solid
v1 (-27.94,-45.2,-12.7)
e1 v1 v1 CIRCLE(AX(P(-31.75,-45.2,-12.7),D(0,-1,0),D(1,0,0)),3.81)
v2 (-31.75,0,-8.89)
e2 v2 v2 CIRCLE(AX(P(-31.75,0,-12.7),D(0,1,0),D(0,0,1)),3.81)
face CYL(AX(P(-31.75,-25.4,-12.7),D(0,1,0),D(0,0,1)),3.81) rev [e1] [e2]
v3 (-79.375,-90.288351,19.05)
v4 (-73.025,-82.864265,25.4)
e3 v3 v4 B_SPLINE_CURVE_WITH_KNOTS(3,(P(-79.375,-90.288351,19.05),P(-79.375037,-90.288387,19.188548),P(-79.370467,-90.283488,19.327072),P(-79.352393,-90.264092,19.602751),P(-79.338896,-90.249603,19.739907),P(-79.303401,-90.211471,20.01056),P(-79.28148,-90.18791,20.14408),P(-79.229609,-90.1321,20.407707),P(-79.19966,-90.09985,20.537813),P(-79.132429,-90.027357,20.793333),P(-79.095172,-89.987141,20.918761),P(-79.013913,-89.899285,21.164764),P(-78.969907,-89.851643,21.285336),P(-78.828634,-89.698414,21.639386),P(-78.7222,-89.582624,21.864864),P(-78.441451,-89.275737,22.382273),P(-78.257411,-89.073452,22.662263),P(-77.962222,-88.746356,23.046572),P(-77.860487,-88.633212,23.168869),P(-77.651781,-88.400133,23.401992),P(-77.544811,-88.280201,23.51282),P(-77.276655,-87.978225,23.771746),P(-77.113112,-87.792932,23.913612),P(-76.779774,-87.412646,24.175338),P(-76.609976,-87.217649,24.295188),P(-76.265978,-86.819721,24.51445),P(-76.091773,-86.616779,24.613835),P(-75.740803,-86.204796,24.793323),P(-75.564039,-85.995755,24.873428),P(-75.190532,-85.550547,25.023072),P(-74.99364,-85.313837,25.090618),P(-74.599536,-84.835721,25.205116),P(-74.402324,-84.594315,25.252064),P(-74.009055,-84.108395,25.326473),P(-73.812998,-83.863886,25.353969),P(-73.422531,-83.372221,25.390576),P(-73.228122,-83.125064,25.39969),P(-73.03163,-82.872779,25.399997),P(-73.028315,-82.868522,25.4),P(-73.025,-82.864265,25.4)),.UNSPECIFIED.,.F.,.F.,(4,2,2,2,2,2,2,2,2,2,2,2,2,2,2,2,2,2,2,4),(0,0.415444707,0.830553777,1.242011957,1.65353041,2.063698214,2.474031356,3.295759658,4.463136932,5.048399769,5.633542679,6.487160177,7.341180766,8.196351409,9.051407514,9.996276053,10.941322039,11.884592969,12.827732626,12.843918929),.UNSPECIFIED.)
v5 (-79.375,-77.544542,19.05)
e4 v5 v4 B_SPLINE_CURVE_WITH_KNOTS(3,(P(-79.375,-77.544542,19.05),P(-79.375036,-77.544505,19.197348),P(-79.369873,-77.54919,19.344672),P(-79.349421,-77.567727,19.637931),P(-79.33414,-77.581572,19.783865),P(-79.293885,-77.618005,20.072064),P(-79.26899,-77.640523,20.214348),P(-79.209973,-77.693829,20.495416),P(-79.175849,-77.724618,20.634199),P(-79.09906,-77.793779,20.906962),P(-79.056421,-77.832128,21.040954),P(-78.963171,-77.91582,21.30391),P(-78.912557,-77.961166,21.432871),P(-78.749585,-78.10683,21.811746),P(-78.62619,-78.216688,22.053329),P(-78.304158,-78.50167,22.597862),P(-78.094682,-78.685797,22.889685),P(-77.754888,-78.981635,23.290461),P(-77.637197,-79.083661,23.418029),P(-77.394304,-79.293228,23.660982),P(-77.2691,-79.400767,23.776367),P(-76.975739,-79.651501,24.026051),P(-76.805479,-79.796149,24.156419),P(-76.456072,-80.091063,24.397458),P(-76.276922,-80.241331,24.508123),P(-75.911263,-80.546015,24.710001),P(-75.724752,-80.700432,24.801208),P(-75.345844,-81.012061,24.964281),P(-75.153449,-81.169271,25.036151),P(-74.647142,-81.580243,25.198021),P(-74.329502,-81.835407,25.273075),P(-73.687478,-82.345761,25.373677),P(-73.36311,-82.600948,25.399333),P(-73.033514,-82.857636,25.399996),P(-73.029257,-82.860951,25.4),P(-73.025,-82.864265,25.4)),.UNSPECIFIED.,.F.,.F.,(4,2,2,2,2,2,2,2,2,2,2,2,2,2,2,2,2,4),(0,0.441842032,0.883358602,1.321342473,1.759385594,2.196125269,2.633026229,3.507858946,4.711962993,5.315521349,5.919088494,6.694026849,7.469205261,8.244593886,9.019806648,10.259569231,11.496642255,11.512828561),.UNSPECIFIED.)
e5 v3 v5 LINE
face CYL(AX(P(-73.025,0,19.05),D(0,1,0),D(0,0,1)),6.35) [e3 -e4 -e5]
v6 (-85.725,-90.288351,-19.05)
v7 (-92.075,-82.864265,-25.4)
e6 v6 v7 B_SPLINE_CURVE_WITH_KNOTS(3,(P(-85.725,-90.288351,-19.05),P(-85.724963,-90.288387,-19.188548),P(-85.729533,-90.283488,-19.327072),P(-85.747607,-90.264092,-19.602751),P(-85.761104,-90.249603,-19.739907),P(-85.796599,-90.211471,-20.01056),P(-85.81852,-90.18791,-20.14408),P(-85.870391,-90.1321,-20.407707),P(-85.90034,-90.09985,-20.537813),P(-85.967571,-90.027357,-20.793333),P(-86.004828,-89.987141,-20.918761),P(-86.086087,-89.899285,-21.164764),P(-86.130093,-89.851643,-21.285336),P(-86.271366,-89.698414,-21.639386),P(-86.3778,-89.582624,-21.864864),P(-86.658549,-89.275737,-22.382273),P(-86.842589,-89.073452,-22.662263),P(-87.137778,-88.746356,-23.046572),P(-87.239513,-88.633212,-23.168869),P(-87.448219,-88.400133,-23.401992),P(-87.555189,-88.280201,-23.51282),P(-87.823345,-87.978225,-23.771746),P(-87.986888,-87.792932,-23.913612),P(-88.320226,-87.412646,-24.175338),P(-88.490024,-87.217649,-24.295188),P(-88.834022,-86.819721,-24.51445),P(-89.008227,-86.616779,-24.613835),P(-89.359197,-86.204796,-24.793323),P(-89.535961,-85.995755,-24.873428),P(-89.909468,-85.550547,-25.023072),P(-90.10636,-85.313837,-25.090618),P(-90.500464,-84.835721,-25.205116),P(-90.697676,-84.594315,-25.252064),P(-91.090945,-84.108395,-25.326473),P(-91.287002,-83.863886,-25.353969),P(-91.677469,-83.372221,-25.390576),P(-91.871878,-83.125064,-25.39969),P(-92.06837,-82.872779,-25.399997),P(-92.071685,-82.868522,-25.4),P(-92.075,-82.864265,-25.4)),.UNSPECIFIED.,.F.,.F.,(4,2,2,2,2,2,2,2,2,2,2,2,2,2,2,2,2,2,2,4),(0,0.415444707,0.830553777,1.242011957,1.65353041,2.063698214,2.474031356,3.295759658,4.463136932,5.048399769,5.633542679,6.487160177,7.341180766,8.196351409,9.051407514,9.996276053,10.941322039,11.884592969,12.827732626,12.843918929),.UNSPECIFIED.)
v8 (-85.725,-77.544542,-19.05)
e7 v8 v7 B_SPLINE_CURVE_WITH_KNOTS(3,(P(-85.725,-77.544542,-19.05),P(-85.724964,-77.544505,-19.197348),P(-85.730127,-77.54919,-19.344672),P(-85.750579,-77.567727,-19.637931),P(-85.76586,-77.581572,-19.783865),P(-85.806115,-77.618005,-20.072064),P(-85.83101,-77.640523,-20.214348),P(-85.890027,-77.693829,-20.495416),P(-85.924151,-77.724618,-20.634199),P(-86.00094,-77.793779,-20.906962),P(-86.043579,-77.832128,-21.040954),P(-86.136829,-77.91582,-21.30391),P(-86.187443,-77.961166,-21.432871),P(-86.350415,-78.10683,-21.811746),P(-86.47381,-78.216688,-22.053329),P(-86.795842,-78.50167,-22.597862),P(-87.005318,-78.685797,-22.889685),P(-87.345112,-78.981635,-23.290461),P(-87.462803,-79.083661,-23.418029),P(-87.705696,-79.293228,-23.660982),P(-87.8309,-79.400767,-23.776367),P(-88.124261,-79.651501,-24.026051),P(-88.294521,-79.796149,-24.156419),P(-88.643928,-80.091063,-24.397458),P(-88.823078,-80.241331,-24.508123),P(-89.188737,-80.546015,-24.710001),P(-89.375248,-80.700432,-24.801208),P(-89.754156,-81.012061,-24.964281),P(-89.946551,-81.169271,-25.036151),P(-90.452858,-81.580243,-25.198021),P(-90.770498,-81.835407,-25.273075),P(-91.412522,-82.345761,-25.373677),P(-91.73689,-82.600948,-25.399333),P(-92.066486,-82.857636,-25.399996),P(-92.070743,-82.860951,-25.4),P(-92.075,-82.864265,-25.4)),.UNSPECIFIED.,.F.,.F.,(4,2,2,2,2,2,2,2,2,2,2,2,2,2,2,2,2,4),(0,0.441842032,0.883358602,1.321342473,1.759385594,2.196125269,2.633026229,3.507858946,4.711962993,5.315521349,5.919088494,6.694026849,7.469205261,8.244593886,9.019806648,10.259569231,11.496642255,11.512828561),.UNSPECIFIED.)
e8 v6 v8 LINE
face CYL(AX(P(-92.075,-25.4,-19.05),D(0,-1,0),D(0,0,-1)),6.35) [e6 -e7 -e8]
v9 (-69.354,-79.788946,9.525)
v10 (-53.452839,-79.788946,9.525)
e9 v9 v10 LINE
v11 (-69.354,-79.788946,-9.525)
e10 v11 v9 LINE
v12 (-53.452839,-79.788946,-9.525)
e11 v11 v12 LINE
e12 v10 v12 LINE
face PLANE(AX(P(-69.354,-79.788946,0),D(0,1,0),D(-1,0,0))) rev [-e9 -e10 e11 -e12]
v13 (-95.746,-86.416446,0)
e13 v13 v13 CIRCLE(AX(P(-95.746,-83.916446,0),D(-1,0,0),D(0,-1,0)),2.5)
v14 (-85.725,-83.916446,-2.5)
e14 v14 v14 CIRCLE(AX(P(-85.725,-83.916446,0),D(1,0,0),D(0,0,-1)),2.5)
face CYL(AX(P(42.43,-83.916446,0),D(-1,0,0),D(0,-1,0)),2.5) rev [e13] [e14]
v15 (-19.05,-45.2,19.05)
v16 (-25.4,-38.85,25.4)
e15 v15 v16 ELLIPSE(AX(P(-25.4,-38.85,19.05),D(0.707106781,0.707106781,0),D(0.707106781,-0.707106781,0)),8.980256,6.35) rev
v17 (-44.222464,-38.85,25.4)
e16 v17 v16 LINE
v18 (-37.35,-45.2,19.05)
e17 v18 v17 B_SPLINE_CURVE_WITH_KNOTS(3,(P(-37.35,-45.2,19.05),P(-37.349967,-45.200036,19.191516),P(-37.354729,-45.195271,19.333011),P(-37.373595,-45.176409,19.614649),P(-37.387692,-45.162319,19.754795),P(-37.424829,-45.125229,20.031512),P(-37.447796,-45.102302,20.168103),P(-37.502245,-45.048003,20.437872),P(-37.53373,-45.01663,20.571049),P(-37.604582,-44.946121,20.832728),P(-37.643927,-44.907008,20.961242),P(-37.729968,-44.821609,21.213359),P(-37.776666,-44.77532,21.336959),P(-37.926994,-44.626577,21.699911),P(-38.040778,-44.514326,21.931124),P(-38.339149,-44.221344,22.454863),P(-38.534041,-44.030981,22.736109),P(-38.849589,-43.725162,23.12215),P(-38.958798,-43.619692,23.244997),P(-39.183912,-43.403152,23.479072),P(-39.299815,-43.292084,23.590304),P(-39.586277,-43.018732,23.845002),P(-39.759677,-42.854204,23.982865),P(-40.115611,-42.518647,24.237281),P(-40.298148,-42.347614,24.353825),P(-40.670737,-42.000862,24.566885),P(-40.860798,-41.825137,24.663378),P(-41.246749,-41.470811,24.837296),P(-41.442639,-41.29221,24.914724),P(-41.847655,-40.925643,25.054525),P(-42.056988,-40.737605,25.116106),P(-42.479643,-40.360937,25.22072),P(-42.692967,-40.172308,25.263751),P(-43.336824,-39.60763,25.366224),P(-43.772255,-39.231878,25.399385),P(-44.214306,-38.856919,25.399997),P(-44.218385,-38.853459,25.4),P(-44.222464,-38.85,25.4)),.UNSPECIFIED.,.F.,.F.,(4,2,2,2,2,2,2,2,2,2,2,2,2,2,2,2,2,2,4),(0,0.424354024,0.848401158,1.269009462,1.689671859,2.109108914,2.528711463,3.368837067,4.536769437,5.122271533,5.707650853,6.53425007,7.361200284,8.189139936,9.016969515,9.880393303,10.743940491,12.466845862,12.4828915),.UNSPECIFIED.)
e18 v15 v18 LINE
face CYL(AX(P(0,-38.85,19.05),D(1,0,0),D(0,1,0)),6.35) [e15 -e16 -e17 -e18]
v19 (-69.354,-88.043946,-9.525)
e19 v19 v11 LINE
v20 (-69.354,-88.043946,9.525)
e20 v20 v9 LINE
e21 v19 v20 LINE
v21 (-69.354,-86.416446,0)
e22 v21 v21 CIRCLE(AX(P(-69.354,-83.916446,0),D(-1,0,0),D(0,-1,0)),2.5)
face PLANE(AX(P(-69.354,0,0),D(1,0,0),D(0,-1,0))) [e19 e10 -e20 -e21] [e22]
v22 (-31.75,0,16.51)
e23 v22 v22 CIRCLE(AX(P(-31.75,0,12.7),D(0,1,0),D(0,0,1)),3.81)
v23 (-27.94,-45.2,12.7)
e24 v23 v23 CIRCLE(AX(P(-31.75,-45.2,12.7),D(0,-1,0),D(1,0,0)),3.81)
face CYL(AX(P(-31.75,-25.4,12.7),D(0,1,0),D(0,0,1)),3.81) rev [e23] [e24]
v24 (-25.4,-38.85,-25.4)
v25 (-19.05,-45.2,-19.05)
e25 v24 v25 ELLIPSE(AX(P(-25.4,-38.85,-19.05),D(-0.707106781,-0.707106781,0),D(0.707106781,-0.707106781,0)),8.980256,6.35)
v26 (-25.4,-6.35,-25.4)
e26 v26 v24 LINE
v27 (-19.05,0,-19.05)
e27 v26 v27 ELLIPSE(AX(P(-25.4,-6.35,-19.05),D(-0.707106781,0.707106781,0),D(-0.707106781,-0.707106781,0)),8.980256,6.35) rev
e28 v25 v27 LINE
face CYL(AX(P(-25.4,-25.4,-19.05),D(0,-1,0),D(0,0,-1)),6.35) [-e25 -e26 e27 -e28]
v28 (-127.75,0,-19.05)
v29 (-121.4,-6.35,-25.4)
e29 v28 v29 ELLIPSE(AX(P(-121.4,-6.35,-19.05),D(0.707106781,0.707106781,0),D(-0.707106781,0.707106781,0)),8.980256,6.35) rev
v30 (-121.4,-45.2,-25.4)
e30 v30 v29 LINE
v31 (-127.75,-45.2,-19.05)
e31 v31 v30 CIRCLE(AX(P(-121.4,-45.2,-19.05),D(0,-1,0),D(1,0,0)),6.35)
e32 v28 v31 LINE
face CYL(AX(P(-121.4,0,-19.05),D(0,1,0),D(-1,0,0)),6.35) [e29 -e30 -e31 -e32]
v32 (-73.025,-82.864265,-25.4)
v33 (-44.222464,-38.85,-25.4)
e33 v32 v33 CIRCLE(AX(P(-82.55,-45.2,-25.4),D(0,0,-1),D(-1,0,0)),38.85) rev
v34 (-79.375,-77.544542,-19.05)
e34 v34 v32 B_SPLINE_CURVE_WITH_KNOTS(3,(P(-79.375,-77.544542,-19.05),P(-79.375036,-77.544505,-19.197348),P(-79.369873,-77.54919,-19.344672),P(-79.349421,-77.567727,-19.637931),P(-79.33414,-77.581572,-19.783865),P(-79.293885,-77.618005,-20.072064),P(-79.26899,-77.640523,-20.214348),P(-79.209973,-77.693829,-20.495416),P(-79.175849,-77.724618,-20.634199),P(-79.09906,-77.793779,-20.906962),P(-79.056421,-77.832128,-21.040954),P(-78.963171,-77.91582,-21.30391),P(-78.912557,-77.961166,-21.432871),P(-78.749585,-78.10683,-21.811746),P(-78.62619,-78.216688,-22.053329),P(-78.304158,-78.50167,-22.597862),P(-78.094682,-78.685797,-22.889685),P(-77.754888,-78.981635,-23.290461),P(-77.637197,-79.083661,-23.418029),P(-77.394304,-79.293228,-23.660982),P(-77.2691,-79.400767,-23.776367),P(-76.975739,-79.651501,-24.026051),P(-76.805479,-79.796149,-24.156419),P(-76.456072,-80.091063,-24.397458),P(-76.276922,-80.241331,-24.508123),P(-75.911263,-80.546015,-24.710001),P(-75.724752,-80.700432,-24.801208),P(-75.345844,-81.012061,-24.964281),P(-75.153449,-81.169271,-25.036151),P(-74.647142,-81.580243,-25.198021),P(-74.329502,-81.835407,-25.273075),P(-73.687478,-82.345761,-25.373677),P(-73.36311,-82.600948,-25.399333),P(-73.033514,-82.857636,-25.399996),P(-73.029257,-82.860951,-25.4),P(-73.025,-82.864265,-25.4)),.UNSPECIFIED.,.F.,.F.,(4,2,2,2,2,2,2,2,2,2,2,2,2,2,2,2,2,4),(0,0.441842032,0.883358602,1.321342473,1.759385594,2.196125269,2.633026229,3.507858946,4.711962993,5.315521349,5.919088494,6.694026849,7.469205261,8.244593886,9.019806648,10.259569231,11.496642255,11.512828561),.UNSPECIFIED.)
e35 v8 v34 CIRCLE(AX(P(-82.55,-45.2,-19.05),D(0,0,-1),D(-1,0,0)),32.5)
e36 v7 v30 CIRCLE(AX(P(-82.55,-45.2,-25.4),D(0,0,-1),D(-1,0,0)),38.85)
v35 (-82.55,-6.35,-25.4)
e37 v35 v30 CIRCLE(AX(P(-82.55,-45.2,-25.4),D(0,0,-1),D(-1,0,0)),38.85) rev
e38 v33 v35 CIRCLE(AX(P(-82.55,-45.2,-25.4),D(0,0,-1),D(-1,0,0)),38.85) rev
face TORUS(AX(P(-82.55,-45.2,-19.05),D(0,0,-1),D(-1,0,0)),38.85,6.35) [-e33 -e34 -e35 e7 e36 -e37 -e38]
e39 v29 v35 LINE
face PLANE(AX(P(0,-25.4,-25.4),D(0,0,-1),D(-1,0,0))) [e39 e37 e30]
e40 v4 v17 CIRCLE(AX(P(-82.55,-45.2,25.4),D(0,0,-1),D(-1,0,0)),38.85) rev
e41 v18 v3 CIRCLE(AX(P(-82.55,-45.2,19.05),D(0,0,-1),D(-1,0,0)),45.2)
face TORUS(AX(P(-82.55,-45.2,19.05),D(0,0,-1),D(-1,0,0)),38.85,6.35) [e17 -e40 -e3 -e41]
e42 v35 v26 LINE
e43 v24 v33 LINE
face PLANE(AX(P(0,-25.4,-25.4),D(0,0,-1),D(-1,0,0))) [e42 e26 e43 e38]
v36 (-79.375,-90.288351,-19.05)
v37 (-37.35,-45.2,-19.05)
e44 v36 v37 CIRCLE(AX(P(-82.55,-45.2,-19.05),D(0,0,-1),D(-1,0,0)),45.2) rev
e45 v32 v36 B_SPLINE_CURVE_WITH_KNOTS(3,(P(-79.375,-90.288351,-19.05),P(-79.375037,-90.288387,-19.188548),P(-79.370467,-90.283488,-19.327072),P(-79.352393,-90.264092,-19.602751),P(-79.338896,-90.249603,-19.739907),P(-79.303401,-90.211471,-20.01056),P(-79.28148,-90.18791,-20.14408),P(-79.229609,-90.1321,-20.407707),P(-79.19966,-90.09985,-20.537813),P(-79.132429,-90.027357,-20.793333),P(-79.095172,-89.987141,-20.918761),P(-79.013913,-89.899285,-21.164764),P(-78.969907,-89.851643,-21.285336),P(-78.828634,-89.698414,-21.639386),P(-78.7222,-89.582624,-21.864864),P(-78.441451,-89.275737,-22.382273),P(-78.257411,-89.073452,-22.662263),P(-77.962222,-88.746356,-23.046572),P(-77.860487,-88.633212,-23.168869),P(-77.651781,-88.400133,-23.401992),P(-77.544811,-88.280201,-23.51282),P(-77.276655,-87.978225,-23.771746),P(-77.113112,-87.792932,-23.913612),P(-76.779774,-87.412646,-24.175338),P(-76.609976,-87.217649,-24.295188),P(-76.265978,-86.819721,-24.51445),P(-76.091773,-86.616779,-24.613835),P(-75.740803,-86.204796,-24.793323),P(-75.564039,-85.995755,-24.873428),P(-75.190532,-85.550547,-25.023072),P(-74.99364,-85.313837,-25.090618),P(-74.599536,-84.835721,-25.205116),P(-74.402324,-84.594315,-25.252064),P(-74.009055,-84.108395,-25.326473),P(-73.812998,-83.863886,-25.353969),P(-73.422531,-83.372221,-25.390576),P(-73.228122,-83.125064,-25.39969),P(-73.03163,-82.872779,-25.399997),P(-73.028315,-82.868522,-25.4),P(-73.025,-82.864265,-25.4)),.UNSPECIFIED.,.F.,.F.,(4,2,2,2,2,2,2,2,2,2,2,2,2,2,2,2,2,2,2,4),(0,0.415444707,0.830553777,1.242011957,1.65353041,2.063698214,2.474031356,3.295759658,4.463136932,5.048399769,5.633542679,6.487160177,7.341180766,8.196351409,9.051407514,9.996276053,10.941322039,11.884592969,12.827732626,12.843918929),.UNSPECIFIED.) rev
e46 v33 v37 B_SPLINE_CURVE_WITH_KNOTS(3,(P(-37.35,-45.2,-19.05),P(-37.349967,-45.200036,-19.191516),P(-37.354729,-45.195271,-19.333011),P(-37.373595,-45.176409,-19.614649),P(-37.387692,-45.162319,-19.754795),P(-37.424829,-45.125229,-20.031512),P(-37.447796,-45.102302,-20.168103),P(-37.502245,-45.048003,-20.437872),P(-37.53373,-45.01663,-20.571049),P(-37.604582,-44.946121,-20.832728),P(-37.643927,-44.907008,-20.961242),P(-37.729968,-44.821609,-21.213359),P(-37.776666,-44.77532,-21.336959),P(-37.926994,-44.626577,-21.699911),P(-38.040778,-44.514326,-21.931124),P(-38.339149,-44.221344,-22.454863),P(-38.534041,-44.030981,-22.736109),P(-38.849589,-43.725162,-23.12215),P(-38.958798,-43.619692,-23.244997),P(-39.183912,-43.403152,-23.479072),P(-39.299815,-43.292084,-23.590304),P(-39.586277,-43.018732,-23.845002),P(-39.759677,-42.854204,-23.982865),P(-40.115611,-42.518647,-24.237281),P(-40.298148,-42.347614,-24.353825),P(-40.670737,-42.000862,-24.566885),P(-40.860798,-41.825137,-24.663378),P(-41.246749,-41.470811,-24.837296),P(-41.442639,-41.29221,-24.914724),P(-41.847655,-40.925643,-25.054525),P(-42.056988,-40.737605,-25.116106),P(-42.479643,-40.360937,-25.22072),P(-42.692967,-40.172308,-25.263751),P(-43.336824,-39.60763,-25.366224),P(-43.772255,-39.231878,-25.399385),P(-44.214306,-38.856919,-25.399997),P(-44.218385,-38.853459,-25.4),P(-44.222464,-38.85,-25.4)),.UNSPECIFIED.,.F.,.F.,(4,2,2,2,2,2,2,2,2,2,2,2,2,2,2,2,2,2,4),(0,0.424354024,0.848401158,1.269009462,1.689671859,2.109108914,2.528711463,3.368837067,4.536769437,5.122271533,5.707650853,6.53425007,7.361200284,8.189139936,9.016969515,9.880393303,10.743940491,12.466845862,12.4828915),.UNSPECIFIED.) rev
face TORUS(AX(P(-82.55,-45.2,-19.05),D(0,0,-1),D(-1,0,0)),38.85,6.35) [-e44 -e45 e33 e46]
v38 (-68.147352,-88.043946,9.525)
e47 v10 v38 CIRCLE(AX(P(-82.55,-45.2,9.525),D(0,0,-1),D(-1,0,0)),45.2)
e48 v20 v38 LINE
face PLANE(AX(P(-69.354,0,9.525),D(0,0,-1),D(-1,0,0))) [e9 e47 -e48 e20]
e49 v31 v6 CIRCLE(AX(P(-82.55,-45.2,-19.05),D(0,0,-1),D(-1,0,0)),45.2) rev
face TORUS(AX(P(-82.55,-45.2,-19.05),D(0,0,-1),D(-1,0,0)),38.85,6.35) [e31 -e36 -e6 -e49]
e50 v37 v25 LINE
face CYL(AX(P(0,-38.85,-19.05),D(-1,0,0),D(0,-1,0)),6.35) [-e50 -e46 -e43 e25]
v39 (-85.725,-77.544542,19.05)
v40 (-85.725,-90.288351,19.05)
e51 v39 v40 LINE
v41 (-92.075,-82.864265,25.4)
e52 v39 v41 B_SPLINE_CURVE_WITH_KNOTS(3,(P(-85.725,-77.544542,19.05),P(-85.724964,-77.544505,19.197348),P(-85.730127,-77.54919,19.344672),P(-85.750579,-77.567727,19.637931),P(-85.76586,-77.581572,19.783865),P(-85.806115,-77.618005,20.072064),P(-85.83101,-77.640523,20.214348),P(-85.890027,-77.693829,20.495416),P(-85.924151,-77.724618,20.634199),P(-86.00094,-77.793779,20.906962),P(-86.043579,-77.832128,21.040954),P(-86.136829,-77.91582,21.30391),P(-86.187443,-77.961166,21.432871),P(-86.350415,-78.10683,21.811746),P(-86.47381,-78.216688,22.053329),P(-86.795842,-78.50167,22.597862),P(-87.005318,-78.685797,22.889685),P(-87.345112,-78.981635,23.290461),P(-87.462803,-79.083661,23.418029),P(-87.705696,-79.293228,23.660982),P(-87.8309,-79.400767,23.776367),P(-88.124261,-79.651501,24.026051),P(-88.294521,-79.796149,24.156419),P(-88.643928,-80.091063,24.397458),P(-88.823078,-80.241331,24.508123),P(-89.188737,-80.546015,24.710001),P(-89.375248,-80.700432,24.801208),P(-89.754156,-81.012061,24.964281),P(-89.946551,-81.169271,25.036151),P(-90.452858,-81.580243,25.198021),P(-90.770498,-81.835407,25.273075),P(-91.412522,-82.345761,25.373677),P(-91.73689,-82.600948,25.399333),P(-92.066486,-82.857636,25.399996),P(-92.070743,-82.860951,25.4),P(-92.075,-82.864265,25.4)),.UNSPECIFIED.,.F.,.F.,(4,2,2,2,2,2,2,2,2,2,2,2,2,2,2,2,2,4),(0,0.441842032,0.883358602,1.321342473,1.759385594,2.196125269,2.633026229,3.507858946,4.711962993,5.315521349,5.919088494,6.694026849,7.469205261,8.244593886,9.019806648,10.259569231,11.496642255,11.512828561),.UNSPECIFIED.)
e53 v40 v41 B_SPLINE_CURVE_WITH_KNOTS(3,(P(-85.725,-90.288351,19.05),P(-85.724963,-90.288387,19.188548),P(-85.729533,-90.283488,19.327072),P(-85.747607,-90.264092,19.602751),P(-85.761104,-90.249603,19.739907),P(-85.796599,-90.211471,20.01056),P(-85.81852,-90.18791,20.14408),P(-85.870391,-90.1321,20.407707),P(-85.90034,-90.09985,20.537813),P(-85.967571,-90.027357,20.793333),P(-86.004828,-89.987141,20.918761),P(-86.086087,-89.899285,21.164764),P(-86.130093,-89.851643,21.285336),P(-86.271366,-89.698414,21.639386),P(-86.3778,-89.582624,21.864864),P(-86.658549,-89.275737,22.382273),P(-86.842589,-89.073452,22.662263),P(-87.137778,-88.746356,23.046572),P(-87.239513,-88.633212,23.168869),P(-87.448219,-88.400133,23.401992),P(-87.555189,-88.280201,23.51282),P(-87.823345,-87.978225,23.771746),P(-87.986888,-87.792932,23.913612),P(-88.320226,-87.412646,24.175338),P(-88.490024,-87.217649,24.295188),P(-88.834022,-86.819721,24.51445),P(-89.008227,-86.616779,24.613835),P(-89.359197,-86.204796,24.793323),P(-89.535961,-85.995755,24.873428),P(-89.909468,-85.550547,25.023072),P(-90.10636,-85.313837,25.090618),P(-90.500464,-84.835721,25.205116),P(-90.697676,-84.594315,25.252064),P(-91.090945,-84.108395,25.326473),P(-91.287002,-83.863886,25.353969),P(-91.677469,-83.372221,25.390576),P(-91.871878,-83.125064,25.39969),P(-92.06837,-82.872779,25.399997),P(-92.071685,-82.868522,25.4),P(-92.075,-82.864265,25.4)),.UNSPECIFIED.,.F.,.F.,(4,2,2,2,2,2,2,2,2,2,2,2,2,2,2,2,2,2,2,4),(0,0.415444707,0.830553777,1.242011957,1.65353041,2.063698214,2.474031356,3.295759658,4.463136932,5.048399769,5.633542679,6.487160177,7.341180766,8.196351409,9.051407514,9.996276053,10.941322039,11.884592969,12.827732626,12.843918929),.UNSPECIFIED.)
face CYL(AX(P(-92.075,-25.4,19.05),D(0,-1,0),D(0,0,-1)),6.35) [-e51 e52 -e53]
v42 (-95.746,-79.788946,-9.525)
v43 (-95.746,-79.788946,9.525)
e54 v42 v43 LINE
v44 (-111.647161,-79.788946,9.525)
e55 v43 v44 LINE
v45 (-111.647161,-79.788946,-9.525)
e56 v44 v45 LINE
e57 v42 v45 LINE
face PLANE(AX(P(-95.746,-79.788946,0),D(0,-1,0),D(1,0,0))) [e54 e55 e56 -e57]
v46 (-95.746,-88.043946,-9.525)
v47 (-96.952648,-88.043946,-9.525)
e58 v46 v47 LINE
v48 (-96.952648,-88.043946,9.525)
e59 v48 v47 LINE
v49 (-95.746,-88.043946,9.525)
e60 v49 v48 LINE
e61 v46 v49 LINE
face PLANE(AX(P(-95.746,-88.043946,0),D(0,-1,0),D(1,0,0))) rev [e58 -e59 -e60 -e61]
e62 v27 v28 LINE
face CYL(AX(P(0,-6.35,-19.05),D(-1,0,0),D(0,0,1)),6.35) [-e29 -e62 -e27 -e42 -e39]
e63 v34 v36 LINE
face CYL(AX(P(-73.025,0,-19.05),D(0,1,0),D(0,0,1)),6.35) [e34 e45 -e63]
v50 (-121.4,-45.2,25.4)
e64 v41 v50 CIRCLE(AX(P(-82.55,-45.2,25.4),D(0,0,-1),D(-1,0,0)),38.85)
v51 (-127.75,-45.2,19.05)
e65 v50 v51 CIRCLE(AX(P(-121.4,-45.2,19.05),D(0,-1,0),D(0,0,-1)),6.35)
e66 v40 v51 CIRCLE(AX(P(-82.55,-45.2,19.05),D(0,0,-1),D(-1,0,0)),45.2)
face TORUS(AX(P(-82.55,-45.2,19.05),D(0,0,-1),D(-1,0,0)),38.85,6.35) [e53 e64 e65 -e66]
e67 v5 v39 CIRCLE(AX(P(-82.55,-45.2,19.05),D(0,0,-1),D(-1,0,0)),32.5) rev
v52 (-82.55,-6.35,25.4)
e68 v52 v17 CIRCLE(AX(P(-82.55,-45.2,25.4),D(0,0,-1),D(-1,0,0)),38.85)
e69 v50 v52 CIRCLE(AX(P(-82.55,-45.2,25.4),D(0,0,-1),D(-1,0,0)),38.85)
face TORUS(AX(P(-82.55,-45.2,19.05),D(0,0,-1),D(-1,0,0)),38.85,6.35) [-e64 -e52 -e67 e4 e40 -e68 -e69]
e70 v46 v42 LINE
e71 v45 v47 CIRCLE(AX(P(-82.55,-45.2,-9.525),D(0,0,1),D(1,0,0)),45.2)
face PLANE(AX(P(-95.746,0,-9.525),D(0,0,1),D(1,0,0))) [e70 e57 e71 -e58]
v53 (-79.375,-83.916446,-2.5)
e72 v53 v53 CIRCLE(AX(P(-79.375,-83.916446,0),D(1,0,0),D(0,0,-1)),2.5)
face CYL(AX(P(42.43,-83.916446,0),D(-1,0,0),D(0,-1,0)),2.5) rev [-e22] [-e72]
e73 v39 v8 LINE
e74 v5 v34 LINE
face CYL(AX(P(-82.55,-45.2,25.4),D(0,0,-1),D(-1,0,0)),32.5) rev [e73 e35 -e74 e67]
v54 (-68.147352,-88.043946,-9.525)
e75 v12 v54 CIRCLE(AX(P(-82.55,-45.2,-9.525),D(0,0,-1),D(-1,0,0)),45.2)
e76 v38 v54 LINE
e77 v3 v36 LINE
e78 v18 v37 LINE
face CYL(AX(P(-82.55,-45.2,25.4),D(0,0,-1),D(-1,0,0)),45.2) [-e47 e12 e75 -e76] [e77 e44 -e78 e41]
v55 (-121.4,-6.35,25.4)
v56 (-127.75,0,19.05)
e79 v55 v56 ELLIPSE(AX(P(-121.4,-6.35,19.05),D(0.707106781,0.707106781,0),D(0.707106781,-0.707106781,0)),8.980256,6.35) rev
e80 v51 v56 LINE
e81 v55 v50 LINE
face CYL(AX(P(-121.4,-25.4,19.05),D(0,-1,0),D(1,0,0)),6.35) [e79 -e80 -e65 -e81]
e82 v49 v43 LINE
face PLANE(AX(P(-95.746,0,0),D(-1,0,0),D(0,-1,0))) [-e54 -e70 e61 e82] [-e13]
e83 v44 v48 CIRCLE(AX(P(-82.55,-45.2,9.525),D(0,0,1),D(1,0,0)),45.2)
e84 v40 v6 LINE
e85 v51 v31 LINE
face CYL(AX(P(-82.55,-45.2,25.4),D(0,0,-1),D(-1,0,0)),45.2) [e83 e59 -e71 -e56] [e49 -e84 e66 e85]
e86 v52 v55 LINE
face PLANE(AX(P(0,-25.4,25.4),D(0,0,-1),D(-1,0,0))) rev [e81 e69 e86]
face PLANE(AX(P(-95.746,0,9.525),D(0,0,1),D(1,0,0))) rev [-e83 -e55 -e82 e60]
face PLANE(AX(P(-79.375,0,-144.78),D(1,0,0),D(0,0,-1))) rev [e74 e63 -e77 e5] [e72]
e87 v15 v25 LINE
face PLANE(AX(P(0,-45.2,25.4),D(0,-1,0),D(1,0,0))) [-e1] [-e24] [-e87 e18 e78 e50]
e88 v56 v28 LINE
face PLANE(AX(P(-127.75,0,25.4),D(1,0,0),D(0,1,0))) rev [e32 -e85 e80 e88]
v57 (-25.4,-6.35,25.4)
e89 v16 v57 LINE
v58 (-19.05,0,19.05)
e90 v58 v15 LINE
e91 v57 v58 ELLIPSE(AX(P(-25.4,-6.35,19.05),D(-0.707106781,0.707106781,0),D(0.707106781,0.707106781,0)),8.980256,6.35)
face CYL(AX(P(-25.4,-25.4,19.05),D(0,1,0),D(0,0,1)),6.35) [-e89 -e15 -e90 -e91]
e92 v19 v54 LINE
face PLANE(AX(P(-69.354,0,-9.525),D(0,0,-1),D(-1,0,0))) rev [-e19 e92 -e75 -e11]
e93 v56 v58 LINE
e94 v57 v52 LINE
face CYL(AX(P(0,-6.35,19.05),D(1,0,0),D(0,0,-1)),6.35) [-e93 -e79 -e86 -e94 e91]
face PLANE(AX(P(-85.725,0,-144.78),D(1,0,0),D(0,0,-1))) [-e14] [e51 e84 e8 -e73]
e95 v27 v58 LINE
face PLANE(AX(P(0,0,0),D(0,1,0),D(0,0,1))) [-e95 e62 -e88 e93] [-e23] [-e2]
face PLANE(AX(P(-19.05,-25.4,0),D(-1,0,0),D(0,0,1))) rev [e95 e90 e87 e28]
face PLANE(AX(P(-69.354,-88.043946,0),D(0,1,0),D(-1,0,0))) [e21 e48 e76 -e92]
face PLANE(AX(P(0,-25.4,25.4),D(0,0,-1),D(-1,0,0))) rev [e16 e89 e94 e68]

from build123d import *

# Parameters (mm, degrees)
SKETCH2_W           = 25.4
SKETCH2_H           = 50.8
SKETCH2_R           = 3.81
BOSS_EXTRUDE1_DEPTH = 25.4
BOSS_EXTRUDE2_DEPTH = 25.4
CUT_EXTRUDE1_DEPTH  = 170.18
CUT_EXTRUDE2_DEPTH  = 170.18
SKETCH5_3_W         = 19.05
SKETCH5_3_H         = 8.255
SKETCH5_3_R         = 2.5
CUT_EXTRUDE3_DEPTH  = 32.004
SKETCH6_R           = 3.81
CUT_EXTRUDE4_DEPTH  = 32.004
FILLET1_R           = 6.35


with BuildPart() as part:
    # Sketch2 → Boss-Extrude1 (new body)
    with BuildSketch(Plane(origin=(0, 0, 0), x_dir=(1, 0, 0), z_dir=(0, 1, 0))):
        with Locations((-31.75, 0)):
            Rectangle(SKETCH2_W, SKETCH2_H)
        with Locations(Location((-31.75, -12.7, 0), (0, 0, 270))):
            Circle(SKETCH2_R, mode=Mode.SUBTRACT)
        with Locations(Location((-31.75, 12.7, 0), (0, 0, 270))):
            Circle(SKETCH2_R, mode=Mode.SUBTRACT)
    extrude(amount=-BOSS_EXTRUDE1_DEPTH)

    # Sketch3 → Boss-Extrude2 (add, symmetric)
    with BuildSketch(Plane.XY):
        with BuildLine():
            Line((-44.45, -25.4), (-44.45, 0))
            Line((-44.45, 0), (-127.75, 0))
            Line((-127.75, 0), (-127.75, -45.2))
            Line((-127.75, -45.2), (-115.05, -45.2))
            ThreePointArc((-115.05, -45.2), (-82.55, -12.7), (-50.05, -45.2))
            Line((-50.05, -45.2), (-37.35, -45.2))
            Line((-37.35, -45.2), (-19.05, -45.2))
            Line((-19.05, -45.2), (-19.05, -25.4))
            Line((-19.05, -25.4), (-44.45, -25.4))
        make_face()
        with BuildLine():
            Line((-115.05, -45.2), (-127.75, -45.2))
            ThreePointArc((-127.75, -45.2), (-82.55, -90.4), (-37.35, -45.2))
            Line((-37.35, -45.2), (-50.05, -45.2))
            ThreePointArc((-50.05, -45.2), (-82.55, -77.7), (-115.05, -45.2))
        make_face()
    extrude(amount=BOSS_EXTRUDE2_DEPTH, both=True)

    # Sketch4 → Cut-Extrude1 (cut)
    with BuildSketch(Plane.XY.offset(25.4)):
        with BuildLine():
            Line((-85.725, -90.288350768), (-85.725, -104.566683373))
            Line((-85.725, -104.566683373), (-79.375, -104.566683373))
            Line((-79.375, -104.566683373), (-79.375, -90.288350768))
            ThreePointArc((-79.375, -90.288350768), (-82.55, -90.4), (-85.725, -90.288350768))
        make_face()
        with BuildLine():
            ThreePointArc((-50.05, -45.2), (-104.379595736, -21.122650686), (-85.725, -77.544541657))
            Line((-85.725, -77.544541657), (-85.725, -50.833316627))
            Line((-85.725, -50.833316627), (-79.375, -50.833316627))
            Line((-79.375, -50.833316627), (-79.375, -77.544541657))
            ThreePointArc((-79.375, -77.544541657), (-58.472650686, -67.029595736), (-50.05, -45.2))
        make_face()
        with BuildLine():
            Line((-85.725, -50.833316627), (-85.725, -77.544541657))
            ThreePointArc((-85.725, -77.544541657), (-82.55, -77.7), (-79.375, -77.544541657))
            Line((-79.375, -77.544541657), (-79.375, -50.833316627))
            Line((-79.375, -50.833316627), (-85.725, -50.833316627))
        make_face()
        with BuildLine():
            Line((-85.725, -77.544541657), (-85.725, -90.288350768))
            ThreePointArc((-85.725, -90.288350768), (-82.55, -90.4), (-79.375, -90.288350768))
            Line((-79.375, -90.288350768), (-79.375, -77.544541657))
            ThreePointArc((-79.375, -77.544541657), (-82.55, -77.7), (-85.725, -77.544541657))
        make_face()
    extrude(amount=-CUT_EXTRUDE1_DEPTH, mode=Mode.SUBTRACT)

    # Sketch5 → Cut-Extrude2 (cut)
    with BuildSketch(Plane.ZY.offset(127.75)):
        with BuildLine():
            ThreePointArc((2.5, -83.916446213), (1.767766953, -82.14867926), (0, -81.416446213))
            Line((0, -81.416446213), (0, -86.416446213))
            ThreePointArc((0, -86.416446213), (1.767766953, -85.684213166), (2.5, -83.916446213))
        make_face()
        with BuildLine():
            Line((0, -86.416446213), (0, -81.416446213))
            ThreePointArc((0, -81.416446213), (-2.5, -83.916446213), (0, -86.416446213))
        make_face()
    extrude(amount=-CUT_EXTRUDE2_DEPTH, mode=Mode.SUBTRACT)

    # Sketch5<3> → Cut-Extrude3 (cut)
    with BuildSketch(Plane.ZY.offset(127.75)):
        with Locations((0, -83.916446213)):
            Rectangle(SKETCH5_3_W, SKETCH5_3_H)
        with Locations(Location((0, -83.916446213, 0), (0, 0, 270))):
            Circle(SKETCH5_3_R, mode=Mode.SUBTRACT)
    cut_extrude3 = extrude(amount=-CUT_EXTRUDE3_DEPTH, mode=Mode.SUBTRACT)

    # Mirror1: Cut-Extrude3 across plane
    add(cut_extrude3.mirror(Plane.ZY.offset(82.55)), mode=Mode.SUBTRACT)

    # Sketch6 → Cut-Extrude4 (cut)
    with BuildSketch(Plane(origin=(0, -25.4, 0), x_dir=(1, 0, 0), z_dir=(0, 1, 0))):
        with Locations(Location((-31.75, -12.7, 0), (0, 0, 270))):
            Circle(SKETCH6_R)
        with Locations(Location((-31.75, 12.7, 0), (0, 0, 270))):
            Circle(SKETCH6_R)
    extrude(amount=-CUT_EXTRUDE4_DEPTH, mode=Mode.SUBTRACT)

    # Fillet1
    # the kernel refuses this fillet: 6.35 mm, written as the material it takes off along each edge
    with BuildSketch(Plane(origin=(-19.05, -61.075, 25.4), x_dir=(-1, 0, 0), z_dir=(0, 1, 0))) as fillet1_piece_1:
        with BuildLine():
            CenterArc((FILLET1_R, -FILLET1_R), FILLET1_R, 90, 90)
            Line((0, -FILLET1_R), (0, 0))
            Line((0, 0), (FILLET1_R, 0))
        make_face()
    extrude(amount=76.95, mode=Mode.SUBTRACT)
    with BuildSketch(Plane(origin=(-19.05, -61.075, -25.4), x_dir=(-1, 0, 0), z_dir=(0, 1, 0))) as fillet1_piece_2:
        with BuildLine():
            CenterArc((FILLET1_R, FILLET1_R), FILLET1_R, 180, 90)
            Line((0, FILLET1_R), (0, 0))
            Line((0, 0), (FILLET1_R, 0))
        make_face()
    extrude(amount=76.95, mode=Mode.SUBTRACT)
    with BuildSketch(Plane(origin=(-82.55, -45.2, -25.4), x_dir=(-1, 0, 0), z_dir=(0, 1, 0))) as fillet1_piece_3:
        with BuildLine():
            CenterArc((45.2 - FILLET1_R, FILLET1_R), FILLET1_R, 270, 90)
            Line((45.2, FILLET1_R), (45.2, 0))
            Line((45.2, 0), (45.2 - FILLET1_R, 0))
        make_face()
    revolve(axis=Axis((-82.55, -45.2, -25.4), (0, 0, 1)), revolution_arc=106.102651965, mode=Mode.SUBTRACT)
    with BuildSketch(Plane(origin=(-53.225, -45.2, 25.4), x_dir=(0, 1, 0), z_dir=(1, 0, 0))) as fillet1_piece_4_section:
        with BuildLine():
            CenterArc((FILLET1_R, -FILLET1_R), FILLET1_R, 90, 90)
            Line((0, -FILLET1_R), (0, 0))
            Line((0, 0), (FILLET1_R, 0))
        make_face()
    fillet1_piece_4 = extrude(amount=50.05, mode=Mode.PRIVATE)
    fillet1_piece_4 = fillet1_piece_4 - Plane(origin=(-82.55, -45.2, 23.963727381), x_dir=(-1, 0, 0), z_dir=(0, 0, 1)) * Cylinder(45.2, 126, mode=Mode.PRIVATE)
    add(fillet1_piece_4, mode=Mode.SUBTRACT)
    with BuildSketch(Plane(origin=(-127.75, 15.875, -25.4), x_dir=(1, 0, 0), z_dir=(0, -1, 0))) as fillet1_piece_5:
        with BuildLine():
            CenterArc((FILLET1_R, FILLET1_R), FILLET1_R, 180, 90)
            Line((0, FILLET1_R), (0, 0))
            Line((0, 0), (FILLET1_R, 0))
        make_face()
    extrude(amount=61.075, mode=Mode.SUBTRACT)
    with BuildSketch(Plane(origin=(-82.55, -45.2, 25.4), x_dir=(-1, 0, 0), z_dir=(0, 1, 0))) as fillet1_piece_6:
        with BuildLine():
            CenterArc((45.2 - FILLET1_R, -FILLET1_R), FILLET1_R, 360, 90)
            Line((45.2, -FILLET1_R), (45.2, 0))
            Line((45.2, 0), (45.2 - FILLET1_R, 0))
        make_face()
    revolve(axis=Axis((-82.55, -45.2, 25.4), (0, 0, 1)), revolution_arc=106.102651965, mode=Mode.SUBTRACT)
    with BuildSketch(Plane(origin=(-127.75, 15.875, 25.4), x_dir=(1, 0, 0), z_dir=(0, -1, 0))) as fillet1_piece_7:
        with BuildLine():
            CenterArc((FILLET1_R, -FILLET1_R), FILLET1_R, 90, 90)
            Line((0, -FILLET1_R), (0, 0))
            Line((0, 0), (FILLET1_R, 0))
        make_face()
    extrude(amount=61.075, mode=Mode.SUBTRACT)
    with BuildSketch(Plane(origin=(-3.175, -45.2, -25.4), x_dir=(0, 0, 1), z_dir=(-1, 0, 0))) as fillet1_piece_8_section:
        with BuildLine():
            CenterArc((FILLET1_R, FILLET1_R), FILLET1_R, 180, 90)
            Line((0, FILLET1_R), (0, 0))
            Line((0, 0), (FILLET1_R, 0))
        make_face()
    fillet1_piece_8 = extrude(amount=50.05, mode=Mode.PRIVATE)
    fillet1_piece_8 = fillet1_piece_8 - Plane(origin=(-82.55, -45.2, -23.963731438), x_dir=(-1, 0, 0), z_dir=(0, 0, 1)) * Cylinder(45.2, 126, mode=Mode.PRIVATE)
    add(fillet1_piece_8, mode=Mode.SUBTRACT)
    with BuildSketch(Plane(origin=(-82.55, -45.2, -25.4), x_dir=(-0.2773591231629705, -0.9607663174769753, 0), z_dir=(-0.9607663174769753, 0.2773591231629705, 0))) as fillet1_piece_9:
        with BuildLine():
            CenterArc((45.2 - FILLET1_R, FILLET1_R), FILLET1_R, 270, 90)
            Line((45.2, FILLET1_R), (45.2, 0))
            Line((45.2, 0), (45.2 - FILLET1_R, 0))
        make_face()
    revolve(axis=Axis((-82.55, -45.2, -25.4), (0, 0, 1)), revolution_arc=106.102651965, mode=Mode.SUBTRACT)
    with BuildSketch(Plane(origin=(-82.55, -45.2, 25.4), x_dir=(-0.27735912316299666, -0.9607663174769677, 0), z_dir=(-0.9607663174769677, 0.27735912316299666, 0))) as fillet1_piece_10:
        with BuildLine():
            CenterArc((45.2 - FILLET1_R, -FILLET1_R), FILLET1_R, 0, 90)
            Line((45.2, -FILLET1_R), (45.2, 0))
            Line((45.2, 0), (45.2 - FILLET1_R, 0))
        make_face()
    revolve(axis=Axis((-82.55, -45.2, 25.4), (0, 0, 1)), revolution_arc=106.102651965, mode=Mode.SUBTRACT)
    with BuildSketch(Plane(origin=(-82.55, -45.2, 25.4), x_dir=(-0.0031415874858820546, -0.9999950652018581, 0), z_dir=(0.9999950652018581, -0.0031415874858820546, 0))) as fillet1_piece_11:
        with BuildLine():
            CenterArc((32.5 + FILLET1_R, FILLET1_R), FILLET1_R, 180, 90)
            Line((32.5, FILLET1_R), (32.5, 0))
            Line((32.5, 0), (32.5 + FILLET1_R, 0))
        make_face()
    revolve(axis=Axis((-82.55, -45.2, 25.4), (0, 0, -1)), revolution_arc=359.64, mode=Mode.SUBTRACT)
    with BuildSketch(Plane(origin=(-82.55, -45.2, -25.4), x_dir=(-0.003141587485896922, -0.9999950652018581, 0), z_dir=(0.9999950652018581, -0.003141587485896922, 0))) as fillet1_piece_12:
        with BuildLine():
            CenterArc((32.5 + FILLET1_R, -FILLET1_R), FILLET1_R, 90, 90)
            Line((32.5, -FILLET1_R), (32.5, 0))
            Line((32.5, 0), (32.5 + FILLET1_R, 0))
        make_face()
    revolve(axis=Axis((-82.55, -45.2, -25.4), (0, 0, -1)), revolution_arc=359.64, mode=Mode.SUBTRACT)
    with BuildSketch(Plane(origin=(-79.375, -61.669541657, -25.4), x_dir=(1, 0, 0), z_dir=(0, -1, 0)), Plane(origin=(-85.725, -106.163350768, -25.4), x_dir=(-1, 0, 0), z_dir=(0, 1, 0))) as fillet1_piece_13:
        with BuildLine():
            CenterArc((FILLET1_R, FILLET1_R), FILLET1_R, 180, 90)
            Line((0, FILLET1_R), (0, 0))
            Line((0, 0), (FILLET1_R, 0))
        make_face()
    extrude(amount=44.493809111, mode=Mode.SUBTRACT)
    with BuildSketch(Plane(origin=(-79.375, -61.669541657, 25.4), x_dir=(1, 0, 0), z_dir=(0, -1, 0)), Plane(origin=(-85.725, -106.163350768, 25.4), x_dir=(-1, 0, 0), z_dir=(0, 1, 0))) as fillet1_piece_14:
        with BuildLine():
            CenterArc((FILLET1_R, -FILLET1_R), FILLET1_R, 90, 90)
            Line((0, -FILLET1_R), (0, 0))
            Line((0, 0), (FILLET1_R, 0))
        make_face()
    extrude(amount=44.493809111, mode=Mode.SUBTRACT)
    with BuildSketch(Plane(origin=(-3.175, 0, 25.4), x_dir=(0, -1, 0), z_dir=(-1, 0, 0))) as fillet1_piece_15:
        with BuildLine():
            CenterArc((FILLET1_R, -FILLET1_R), FILLET1_R, 90, 90)
            Line((0, -FILLET1_R), (0, 0))
            Line((0, 0), (FILLET1_R, 0))
        make_face()
    extrude(amount=140.45, mode=Mode.SUBTRACT)
    with BuildSketch(Plane(origin=(-3.175, 0, -25.4), x_dir=(0, -1, 0), z_dir=(-1, 0, 0))) as fillet1_piece_16:
        with BuildLine():
            CenterArc((FILLET1_R, FILLET1_R), FILLET1_R, 180, 90)
            Line((0, FILLET1_R), (0, 0))
            Line((0, 0), (FILLET1_R, 0))
        make_face()
    extrude(amount=140.45, mode=Mode.SUBTRACT)
    with BuildSketch(Plane(origin=(-82.55, -45.2, 25.4), x_dir=(-0.27735912316299666, -0.9607663174769677, 0), z_dir=(-0.9607663174769677, 0.27735912316299666, 0))) as fillet1_piece_17a_section:
        with BuildLine():
            CenterArc((45.2 - FILLET1_R, -FILLET1_R), FILLET1_R, 0, 90)
            Line((45.2, -FILLET1_R), (45.2, 0))
            Line((45.2, 0), (45.2 - FILLET1_R, 0))
        make_face()
    fillet1_piece_17a = revolve(axis=Axis((-82.55, -45.2, 25.4), (0, 0, 1)), revolution_arc=126.233269218, mode=Mode.PRIVATE)
    fillet1_piece_17a = split(fillet1_piece_17a, bisect_by=Plane(origin=(-39.640485511, -45.2, 23.937092518), z_dir=(0, 1, 0)), keep=Keep.TOP, mode=Mode.PRIVATE)
    with BuildSketch(Plane(origin=(-53.225, -45.2, 25.4), x_dir=(0, 1, 0), z_dir=(1, 0, 0))) as fillet1_piece_17b_section:
        with BuildLine():
            CenterArc((FILLET1_R, -FILLET1_R), FILLET1_R, 90, 90)
            Line((0, -FILLET1_R), (0, 0))
            Line((0, 0), (FILLET1_R, 0))
        make_face()
    fillet1_piece_17b = extrude(amount=50.05, mode=Mode.PRIVATE)
    fillet1_piece_17b = fillet1_piece_17b & Plane(origin=(-82.55, -45.2, 23.959488183), x_dir=(-1, 0, 0), z_dir=(0, 0, 1)) * Cylinder(45.2, 126, mode=Mode.PRIVATE)
    fillet1_piece_17 = fillet1_piece_17a & fillet1_piece_17b
    add(fillet1_piece_17, mode=Mode.SUBTRACT)
    with BuildSketch(Plane(origin=(-3.175, -45.2, -25.4), x_dir=(0, 0, 1), z_dir=(-1, 0, 0))) as fillet1_piece_18a_section:
        with BuildLine():
            CenterArc((FILLET1_R, FILLET1_R), FILLET1_R, 180, 90)
            Line((0, FILLET1_R), (0, 0))
            Line((0, 0), (FILLET1_R, 0))
        make_face()
    fillet1_piece_18a = extrude(amount=50.05, mode=Mode.PRIVATE)
    fillet1_piece_18a = fillet1_piece_18a & Plane(origin=(-82.55, -45.2, -23.959492229), x_dir=(-1, 0, 0), z_dir=(0, 0, 1)) * Cylinder(45.2, 126, mode=Mode.PRIVATE)
    with BuildSketch(Plane(origin=(-82.55, -45.2, -25.4), x_dir=(-0.2773591231629705, -0.9607663174769753, 0), z_dir=(-0.9607663174769753, 0.2773591231629705, 0))) as fillet1_piece_18b_section:
        with BuildLine():
            CenterArc((45.2 - FILLET1_R, FILLET1_R), FILLET1_R, 270, 90)
            Line((45.2, FILLET1_R), (45.2, 0))
            Line((45.2, 0), (45.2 - FILLET1_R, 0))
        make_face()
    fillet1_piece_18b = revolve(axis=Axis((-82.55, -45.2, -25.4), (0, 0, 1)), revolution_arc=126.233269218, mode=Mode.PRIVATE)
    fillet1_piece_18b = split(fillet1_piece_18b, bisect_by=Plane(origin=(-39.640485499, -45.2, -23.937092515), z_dir=(0, 1, 0)), keep=Keep.TOP, mode=Mode.PRIVATE)
    fillet1_piece_18 = fillet1_piece_18a & fillet1_piece_18b
    add(fillet1_piece_18, mode=Mode.SUBTRACT)


solid = part.part
